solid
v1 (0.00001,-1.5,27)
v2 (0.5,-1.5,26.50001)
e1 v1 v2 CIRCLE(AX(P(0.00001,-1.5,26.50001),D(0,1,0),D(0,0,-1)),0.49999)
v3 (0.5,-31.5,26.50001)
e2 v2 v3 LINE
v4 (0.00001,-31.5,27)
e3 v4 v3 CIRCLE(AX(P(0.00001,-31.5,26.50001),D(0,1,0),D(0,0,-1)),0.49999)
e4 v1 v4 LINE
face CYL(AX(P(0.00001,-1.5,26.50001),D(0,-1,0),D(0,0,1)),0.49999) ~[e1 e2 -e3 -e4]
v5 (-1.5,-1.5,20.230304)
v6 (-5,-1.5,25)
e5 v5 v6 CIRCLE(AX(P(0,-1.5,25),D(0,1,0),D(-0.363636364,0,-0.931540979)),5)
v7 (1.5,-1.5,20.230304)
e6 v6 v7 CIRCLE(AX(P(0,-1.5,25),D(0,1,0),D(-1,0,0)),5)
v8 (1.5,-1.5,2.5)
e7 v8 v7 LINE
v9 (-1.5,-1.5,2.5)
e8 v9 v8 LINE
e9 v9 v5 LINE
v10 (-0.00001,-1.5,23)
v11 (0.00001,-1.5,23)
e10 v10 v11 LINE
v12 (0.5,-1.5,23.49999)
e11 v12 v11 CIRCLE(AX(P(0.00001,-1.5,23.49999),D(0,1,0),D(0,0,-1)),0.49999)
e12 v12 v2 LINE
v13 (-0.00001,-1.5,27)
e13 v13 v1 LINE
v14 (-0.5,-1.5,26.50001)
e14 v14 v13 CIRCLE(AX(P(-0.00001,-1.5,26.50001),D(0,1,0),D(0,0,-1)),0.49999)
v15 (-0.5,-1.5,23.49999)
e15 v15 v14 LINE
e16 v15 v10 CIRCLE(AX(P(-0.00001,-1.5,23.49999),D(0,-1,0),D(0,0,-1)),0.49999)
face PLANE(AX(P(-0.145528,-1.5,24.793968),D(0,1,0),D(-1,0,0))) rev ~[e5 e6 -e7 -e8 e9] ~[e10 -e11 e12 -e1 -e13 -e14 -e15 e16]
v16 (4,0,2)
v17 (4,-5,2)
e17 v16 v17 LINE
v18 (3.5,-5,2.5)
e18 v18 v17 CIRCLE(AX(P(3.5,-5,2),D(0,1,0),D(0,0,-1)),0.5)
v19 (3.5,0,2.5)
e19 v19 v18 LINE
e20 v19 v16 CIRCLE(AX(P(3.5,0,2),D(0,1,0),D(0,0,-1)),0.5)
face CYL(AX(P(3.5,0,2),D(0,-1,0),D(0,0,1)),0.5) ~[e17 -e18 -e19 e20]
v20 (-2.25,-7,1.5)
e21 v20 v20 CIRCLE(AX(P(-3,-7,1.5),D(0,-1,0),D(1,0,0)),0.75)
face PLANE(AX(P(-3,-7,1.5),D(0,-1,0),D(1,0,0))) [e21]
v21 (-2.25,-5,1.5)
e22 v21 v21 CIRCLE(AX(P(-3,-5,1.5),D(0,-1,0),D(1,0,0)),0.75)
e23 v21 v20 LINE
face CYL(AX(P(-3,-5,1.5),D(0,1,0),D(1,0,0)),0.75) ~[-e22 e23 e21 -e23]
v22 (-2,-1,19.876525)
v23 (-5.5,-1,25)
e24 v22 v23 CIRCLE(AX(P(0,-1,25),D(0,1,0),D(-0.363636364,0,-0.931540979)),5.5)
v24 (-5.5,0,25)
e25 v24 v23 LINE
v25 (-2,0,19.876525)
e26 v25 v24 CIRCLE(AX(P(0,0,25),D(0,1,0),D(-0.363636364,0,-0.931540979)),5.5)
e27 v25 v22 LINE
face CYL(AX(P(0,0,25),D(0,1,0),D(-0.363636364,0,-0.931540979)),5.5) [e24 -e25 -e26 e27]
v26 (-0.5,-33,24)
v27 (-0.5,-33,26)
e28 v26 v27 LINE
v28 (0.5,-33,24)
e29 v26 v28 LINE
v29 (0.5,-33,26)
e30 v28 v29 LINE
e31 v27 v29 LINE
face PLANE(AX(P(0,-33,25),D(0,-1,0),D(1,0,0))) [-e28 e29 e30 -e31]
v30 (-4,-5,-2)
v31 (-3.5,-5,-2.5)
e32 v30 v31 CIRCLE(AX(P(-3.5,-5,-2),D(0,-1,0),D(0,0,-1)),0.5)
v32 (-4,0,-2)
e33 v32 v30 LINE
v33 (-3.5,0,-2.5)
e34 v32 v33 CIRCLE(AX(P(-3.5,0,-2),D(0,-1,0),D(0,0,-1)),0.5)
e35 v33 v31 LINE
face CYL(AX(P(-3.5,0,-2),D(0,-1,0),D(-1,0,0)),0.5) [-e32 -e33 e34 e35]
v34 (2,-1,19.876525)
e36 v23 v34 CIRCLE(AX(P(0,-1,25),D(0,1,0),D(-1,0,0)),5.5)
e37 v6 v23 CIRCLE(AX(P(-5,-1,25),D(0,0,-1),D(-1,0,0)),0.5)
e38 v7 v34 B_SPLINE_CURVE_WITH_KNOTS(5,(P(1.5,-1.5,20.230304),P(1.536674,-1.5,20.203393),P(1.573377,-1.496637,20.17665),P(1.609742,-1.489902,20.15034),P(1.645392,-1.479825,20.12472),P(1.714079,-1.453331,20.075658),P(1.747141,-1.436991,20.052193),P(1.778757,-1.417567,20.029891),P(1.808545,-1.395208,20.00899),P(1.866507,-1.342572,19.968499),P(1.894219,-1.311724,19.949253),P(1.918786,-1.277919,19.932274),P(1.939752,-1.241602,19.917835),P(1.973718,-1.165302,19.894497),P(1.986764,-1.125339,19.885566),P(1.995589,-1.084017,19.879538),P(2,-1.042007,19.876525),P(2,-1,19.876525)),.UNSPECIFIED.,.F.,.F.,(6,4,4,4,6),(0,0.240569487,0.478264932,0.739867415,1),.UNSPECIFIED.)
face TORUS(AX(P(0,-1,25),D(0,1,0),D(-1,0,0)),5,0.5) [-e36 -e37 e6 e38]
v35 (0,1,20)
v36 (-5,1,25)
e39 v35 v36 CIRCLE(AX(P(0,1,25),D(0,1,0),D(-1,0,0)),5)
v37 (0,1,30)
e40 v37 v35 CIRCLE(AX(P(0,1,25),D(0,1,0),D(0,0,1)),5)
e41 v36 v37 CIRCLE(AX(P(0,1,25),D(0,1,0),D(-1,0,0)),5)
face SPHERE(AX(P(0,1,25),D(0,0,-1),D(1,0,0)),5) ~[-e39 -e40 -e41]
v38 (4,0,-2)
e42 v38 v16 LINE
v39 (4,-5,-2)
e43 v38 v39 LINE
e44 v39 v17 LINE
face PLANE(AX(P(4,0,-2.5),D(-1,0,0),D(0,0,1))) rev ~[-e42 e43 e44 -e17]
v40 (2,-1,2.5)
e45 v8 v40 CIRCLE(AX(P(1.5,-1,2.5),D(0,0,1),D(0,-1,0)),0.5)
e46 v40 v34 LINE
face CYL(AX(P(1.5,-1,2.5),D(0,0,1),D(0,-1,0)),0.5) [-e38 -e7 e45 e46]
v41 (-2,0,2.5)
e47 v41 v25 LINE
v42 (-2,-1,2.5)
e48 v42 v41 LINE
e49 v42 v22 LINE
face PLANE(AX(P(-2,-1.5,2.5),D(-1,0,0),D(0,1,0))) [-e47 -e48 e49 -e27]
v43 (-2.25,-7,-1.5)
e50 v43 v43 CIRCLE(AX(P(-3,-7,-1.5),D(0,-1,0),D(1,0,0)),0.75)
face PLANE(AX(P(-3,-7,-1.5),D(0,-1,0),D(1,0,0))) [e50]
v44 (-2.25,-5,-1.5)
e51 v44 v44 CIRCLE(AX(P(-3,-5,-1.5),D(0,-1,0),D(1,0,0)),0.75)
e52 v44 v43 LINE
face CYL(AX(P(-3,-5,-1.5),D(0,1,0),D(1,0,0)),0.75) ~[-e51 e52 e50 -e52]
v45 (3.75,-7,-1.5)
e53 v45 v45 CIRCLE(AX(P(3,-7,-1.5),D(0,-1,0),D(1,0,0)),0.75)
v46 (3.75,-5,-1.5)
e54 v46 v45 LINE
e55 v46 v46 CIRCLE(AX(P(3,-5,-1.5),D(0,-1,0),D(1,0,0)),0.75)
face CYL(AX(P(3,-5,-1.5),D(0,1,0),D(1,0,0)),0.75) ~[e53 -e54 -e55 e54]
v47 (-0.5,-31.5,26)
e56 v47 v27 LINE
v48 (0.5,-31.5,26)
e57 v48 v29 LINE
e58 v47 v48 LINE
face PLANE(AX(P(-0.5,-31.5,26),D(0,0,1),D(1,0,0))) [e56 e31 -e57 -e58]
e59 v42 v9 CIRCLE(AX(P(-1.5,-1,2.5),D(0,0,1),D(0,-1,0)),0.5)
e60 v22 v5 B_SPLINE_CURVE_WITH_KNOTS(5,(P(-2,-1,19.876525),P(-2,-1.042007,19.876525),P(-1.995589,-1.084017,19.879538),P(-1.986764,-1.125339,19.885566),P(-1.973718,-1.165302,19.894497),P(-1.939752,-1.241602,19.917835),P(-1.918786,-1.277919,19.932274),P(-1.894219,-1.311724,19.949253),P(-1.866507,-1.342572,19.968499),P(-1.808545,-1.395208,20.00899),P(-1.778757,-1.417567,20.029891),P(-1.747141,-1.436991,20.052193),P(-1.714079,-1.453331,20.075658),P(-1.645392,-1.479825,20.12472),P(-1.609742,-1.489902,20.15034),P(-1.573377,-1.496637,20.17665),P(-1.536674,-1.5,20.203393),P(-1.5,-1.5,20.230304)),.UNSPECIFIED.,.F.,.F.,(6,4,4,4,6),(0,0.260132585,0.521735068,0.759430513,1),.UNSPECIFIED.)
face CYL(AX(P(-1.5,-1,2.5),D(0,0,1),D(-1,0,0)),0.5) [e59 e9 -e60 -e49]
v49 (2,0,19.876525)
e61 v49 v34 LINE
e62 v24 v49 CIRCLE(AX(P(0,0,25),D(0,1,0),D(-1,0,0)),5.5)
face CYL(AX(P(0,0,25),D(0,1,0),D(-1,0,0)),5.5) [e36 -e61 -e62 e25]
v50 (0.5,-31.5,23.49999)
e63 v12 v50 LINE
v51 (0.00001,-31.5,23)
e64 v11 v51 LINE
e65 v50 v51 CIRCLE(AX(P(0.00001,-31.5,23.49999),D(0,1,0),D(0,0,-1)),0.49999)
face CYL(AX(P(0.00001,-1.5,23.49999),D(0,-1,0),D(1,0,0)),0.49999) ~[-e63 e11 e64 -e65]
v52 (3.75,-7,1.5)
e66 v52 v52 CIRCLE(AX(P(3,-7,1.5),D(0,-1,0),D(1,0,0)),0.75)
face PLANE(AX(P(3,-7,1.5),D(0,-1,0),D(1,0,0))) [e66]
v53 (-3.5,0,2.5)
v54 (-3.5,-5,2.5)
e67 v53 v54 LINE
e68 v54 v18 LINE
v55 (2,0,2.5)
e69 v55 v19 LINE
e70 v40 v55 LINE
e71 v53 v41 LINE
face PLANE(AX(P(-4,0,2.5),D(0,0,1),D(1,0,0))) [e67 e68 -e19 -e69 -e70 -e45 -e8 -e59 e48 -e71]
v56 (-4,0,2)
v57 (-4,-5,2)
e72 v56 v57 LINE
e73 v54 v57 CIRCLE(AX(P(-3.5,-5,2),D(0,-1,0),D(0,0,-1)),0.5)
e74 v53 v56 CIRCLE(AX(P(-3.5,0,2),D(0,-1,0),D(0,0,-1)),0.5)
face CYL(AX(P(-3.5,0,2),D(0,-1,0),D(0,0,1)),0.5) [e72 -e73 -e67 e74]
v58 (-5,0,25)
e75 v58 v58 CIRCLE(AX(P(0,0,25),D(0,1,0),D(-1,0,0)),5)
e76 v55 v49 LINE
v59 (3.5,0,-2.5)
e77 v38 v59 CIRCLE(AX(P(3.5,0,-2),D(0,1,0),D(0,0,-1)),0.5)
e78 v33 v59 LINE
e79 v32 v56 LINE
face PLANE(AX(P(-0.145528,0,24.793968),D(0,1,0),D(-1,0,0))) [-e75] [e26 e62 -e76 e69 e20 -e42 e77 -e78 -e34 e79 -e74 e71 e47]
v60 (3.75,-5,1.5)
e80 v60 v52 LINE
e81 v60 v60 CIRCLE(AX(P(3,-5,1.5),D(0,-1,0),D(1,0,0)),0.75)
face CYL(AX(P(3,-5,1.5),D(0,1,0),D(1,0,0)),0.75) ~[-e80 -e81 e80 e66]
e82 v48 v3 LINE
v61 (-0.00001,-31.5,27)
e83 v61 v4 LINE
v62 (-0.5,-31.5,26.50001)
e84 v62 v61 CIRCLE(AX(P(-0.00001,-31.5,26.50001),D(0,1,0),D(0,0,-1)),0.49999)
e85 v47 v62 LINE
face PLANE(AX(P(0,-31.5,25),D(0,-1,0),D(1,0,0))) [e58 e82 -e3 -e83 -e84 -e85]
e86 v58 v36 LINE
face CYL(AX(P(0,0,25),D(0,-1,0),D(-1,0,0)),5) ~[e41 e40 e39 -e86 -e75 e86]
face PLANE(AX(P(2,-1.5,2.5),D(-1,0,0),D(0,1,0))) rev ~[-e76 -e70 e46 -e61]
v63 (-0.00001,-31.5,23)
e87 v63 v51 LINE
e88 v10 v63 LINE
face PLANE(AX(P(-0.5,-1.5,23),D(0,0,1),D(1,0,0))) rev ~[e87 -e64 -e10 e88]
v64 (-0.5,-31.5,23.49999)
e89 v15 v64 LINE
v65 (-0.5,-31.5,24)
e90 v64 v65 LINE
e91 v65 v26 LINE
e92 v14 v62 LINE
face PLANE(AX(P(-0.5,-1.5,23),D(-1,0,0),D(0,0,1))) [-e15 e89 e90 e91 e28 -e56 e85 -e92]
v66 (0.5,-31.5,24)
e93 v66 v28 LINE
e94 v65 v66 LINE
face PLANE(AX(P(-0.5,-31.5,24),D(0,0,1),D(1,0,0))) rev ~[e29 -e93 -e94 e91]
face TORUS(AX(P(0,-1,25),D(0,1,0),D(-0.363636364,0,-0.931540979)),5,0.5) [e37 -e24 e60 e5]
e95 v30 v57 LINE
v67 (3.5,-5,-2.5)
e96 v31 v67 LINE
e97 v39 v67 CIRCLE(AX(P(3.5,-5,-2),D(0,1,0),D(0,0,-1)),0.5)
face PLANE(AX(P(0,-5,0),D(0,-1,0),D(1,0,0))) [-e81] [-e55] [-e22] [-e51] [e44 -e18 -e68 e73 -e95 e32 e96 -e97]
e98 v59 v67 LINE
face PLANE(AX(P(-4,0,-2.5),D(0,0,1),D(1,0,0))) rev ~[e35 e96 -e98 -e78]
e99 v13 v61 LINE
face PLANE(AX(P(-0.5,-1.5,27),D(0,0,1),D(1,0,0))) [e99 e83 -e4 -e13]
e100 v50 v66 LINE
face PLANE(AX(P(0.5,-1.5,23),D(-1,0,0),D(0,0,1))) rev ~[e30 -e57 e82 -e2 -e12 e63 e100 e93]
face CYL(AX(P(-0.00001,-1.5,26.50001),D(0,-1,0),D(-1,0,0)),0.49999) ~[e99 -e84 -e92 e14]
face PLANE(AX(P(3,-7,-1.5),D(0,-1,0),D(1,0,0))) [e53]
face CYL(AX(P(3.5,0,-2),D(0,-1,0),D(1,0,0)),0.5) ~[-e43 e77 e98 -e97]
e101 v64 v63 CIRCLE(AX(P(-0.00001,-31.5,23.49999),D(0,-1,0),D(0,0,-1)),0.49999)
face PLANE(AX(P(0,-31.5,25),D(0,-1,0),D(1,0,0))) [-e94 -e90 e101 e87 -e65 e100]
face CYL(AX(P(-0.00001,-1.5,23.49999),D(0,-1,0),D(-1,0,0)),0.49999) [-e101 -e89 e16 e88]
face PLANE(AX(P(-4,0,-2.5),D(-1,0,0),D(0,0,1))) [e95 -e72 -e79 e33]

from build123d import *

# Parameters (mm, degrees)
F0_W      = 8
F0_H      = 5
F1_DEPTH  = 5
F2_R      = 0.75
F3_DEPTH  = 2
F4_W      = 4
F4_H      = 1.5
F5_DEPTH  = 23.5
F7_DEPTH  = 1.5
F8_W      = 1
F8_H      = 4
F9_DEPTH  = 30
F10_W     = 1
F10_H     = 2
F11_DEPTH = 1.5
F12_R     = 5
F13_DEPTH = 1
F15_ANGLE = 180
F16_R     = 0.49999
F17_R     = 0.5
F18_R     = 0.5


# Not quite as in the source:
# - a fillet or chamfer is up to 0.001 mm smaller than in the source, because OpenCascade refuses the exact size
# - a feature names something its author has since deleted; it is built from what else it names


with BuildPart() as f1:
    # F0 (on Front) → F1 (new body)
    with BuildSketch(Plane.XZ):
        Rectangle(F0_W, F0_H)
    extrude(amount=F1_DEPTH)

    # F2 (on face) → F3 (join)
    with BuildSketch(Plane.XZ.offset(5)):
        with Locations((-3, 1.5)):
            Circle(F2_R)
        with Locations((3, 1.5)):
            Circle(F2_R)
        with Locations((-3, -1.5)):
            Circle(F2_R)
        with Locations((3, -1.5)):
            Circle(F2_R)
    extrude(amount=F3_DEPTH)

    # F4 (on face) → F5 (join)
    with BuildSketch(Plane.XY.offset(2.5)):
        with Locations((0, -0.75)):
            Rectangle(F4_W, F4_H)
    extrude(amount=F5_DEPTH)

    # F6 (on face) → F7 (join)
    with BuildSketch(Plane(origin=(0, 0, 0), x_dir=(-1, 0, 0), z_dir=(0, 1, 0))):
        with BuildLine():
            ThreePointArc((2, 19.876524617), (4.5414755311, 21.8975815885), (5.5, 25))
            ThreePointArc((5.5, 25), (-3.1024184115, 29.5414755311), (-2, 19.876524617))
            Line((-2, 19.876524617), (-2, 26))
            Line((-2, 26), (2, 26))
            Line((2, 26), (2, 19.876524617))
        make_face()
        with BuildLine():
            Line((-2, 26), (-2, 19.876524617))
            ThreePointArc((-2, 19.876524617), (0, 19.5), (2, 19.876524617))
            Line((2, 19.876524617), (2, 26))
            Line((2, 26), (-2, 26))
        make_face()
    extrude(amount=-F7_DEPTH)

    # F8 (on face) → F9 (join)
    with BuildSketch(Plane.XZ.offset(1.5)):
        with Locations((0, 25)):
            Rectangle(F8_W, F8_H)
    extrude(amount=F9_DEPTH)

    # F10 (on face) → F11 (join)
    with BuildSketch(Plane.XZ.offset(31.5)):
        with Locations((0, 25)):
            Rectangle(F10_W, F10_H)
    extrude(amount=F11_DEPTH)

    # F12 (on face) → F13 (join)
    with BuildSketch(Plane(origin=(0, 0, 0), x_dir=(-1, 0, 0), z_dir=(0, 1, 0))):
        with Locations((0, 25)):
            Circle(F12_R)
    extrude(amount=F13_DEPTH)

    # F14 (on face) → F15 (revolve)
    with BuildSketch(Plane(origin=(0, 1, 0), x_dir=(-1, 0, 0), z_dir=(0, 1, 0))):
        with BuildLine():
            Line((0, 20), (0, 30))
            ThreePointArc((0, 30), (-5, 25), (0, 20))
        make_face()
    revolve(axis=Axis((0, 1, 25), (0, 0, 1)), revolution_arc=F15_ANGLE)

    # F16 (radius 0.5 in the source; OpenCascade refuses exactly that, so slightly less here)
    f16_edges = [f1.edges().sort_by_distance(p)[0] for p in [
        (-0.5, -16.5, 27),
        (0.5, -16.5, 27),
        (0.5, -16.5, 23),
        (-0.5, -16.5, 23),
    ]]
    fillet(f16_edges, radius=F16_R)

    # F17
    f17_edges = [f1.edges().sort_by_distance(p)[0] for p in [
        (-4, -2.5, 2.5),
        (-4, -2.5, -2.5),
        (4, -2.5, -2.5),
        (4, -2.5, 2.5),
    ]]
    fillet(f17_edges, radius=F17_R)

    # F18
    f18_edges = [f1.edges().sort_by_distance(p)[0] for p in [
        (-2, -1.5, 11.188262),
        (2, -1.5, 11.188262),
        (0, -1.5, 30.5),
    ]]
    fillet(f18_edges, radius=F18_R)


solid = f1.part
